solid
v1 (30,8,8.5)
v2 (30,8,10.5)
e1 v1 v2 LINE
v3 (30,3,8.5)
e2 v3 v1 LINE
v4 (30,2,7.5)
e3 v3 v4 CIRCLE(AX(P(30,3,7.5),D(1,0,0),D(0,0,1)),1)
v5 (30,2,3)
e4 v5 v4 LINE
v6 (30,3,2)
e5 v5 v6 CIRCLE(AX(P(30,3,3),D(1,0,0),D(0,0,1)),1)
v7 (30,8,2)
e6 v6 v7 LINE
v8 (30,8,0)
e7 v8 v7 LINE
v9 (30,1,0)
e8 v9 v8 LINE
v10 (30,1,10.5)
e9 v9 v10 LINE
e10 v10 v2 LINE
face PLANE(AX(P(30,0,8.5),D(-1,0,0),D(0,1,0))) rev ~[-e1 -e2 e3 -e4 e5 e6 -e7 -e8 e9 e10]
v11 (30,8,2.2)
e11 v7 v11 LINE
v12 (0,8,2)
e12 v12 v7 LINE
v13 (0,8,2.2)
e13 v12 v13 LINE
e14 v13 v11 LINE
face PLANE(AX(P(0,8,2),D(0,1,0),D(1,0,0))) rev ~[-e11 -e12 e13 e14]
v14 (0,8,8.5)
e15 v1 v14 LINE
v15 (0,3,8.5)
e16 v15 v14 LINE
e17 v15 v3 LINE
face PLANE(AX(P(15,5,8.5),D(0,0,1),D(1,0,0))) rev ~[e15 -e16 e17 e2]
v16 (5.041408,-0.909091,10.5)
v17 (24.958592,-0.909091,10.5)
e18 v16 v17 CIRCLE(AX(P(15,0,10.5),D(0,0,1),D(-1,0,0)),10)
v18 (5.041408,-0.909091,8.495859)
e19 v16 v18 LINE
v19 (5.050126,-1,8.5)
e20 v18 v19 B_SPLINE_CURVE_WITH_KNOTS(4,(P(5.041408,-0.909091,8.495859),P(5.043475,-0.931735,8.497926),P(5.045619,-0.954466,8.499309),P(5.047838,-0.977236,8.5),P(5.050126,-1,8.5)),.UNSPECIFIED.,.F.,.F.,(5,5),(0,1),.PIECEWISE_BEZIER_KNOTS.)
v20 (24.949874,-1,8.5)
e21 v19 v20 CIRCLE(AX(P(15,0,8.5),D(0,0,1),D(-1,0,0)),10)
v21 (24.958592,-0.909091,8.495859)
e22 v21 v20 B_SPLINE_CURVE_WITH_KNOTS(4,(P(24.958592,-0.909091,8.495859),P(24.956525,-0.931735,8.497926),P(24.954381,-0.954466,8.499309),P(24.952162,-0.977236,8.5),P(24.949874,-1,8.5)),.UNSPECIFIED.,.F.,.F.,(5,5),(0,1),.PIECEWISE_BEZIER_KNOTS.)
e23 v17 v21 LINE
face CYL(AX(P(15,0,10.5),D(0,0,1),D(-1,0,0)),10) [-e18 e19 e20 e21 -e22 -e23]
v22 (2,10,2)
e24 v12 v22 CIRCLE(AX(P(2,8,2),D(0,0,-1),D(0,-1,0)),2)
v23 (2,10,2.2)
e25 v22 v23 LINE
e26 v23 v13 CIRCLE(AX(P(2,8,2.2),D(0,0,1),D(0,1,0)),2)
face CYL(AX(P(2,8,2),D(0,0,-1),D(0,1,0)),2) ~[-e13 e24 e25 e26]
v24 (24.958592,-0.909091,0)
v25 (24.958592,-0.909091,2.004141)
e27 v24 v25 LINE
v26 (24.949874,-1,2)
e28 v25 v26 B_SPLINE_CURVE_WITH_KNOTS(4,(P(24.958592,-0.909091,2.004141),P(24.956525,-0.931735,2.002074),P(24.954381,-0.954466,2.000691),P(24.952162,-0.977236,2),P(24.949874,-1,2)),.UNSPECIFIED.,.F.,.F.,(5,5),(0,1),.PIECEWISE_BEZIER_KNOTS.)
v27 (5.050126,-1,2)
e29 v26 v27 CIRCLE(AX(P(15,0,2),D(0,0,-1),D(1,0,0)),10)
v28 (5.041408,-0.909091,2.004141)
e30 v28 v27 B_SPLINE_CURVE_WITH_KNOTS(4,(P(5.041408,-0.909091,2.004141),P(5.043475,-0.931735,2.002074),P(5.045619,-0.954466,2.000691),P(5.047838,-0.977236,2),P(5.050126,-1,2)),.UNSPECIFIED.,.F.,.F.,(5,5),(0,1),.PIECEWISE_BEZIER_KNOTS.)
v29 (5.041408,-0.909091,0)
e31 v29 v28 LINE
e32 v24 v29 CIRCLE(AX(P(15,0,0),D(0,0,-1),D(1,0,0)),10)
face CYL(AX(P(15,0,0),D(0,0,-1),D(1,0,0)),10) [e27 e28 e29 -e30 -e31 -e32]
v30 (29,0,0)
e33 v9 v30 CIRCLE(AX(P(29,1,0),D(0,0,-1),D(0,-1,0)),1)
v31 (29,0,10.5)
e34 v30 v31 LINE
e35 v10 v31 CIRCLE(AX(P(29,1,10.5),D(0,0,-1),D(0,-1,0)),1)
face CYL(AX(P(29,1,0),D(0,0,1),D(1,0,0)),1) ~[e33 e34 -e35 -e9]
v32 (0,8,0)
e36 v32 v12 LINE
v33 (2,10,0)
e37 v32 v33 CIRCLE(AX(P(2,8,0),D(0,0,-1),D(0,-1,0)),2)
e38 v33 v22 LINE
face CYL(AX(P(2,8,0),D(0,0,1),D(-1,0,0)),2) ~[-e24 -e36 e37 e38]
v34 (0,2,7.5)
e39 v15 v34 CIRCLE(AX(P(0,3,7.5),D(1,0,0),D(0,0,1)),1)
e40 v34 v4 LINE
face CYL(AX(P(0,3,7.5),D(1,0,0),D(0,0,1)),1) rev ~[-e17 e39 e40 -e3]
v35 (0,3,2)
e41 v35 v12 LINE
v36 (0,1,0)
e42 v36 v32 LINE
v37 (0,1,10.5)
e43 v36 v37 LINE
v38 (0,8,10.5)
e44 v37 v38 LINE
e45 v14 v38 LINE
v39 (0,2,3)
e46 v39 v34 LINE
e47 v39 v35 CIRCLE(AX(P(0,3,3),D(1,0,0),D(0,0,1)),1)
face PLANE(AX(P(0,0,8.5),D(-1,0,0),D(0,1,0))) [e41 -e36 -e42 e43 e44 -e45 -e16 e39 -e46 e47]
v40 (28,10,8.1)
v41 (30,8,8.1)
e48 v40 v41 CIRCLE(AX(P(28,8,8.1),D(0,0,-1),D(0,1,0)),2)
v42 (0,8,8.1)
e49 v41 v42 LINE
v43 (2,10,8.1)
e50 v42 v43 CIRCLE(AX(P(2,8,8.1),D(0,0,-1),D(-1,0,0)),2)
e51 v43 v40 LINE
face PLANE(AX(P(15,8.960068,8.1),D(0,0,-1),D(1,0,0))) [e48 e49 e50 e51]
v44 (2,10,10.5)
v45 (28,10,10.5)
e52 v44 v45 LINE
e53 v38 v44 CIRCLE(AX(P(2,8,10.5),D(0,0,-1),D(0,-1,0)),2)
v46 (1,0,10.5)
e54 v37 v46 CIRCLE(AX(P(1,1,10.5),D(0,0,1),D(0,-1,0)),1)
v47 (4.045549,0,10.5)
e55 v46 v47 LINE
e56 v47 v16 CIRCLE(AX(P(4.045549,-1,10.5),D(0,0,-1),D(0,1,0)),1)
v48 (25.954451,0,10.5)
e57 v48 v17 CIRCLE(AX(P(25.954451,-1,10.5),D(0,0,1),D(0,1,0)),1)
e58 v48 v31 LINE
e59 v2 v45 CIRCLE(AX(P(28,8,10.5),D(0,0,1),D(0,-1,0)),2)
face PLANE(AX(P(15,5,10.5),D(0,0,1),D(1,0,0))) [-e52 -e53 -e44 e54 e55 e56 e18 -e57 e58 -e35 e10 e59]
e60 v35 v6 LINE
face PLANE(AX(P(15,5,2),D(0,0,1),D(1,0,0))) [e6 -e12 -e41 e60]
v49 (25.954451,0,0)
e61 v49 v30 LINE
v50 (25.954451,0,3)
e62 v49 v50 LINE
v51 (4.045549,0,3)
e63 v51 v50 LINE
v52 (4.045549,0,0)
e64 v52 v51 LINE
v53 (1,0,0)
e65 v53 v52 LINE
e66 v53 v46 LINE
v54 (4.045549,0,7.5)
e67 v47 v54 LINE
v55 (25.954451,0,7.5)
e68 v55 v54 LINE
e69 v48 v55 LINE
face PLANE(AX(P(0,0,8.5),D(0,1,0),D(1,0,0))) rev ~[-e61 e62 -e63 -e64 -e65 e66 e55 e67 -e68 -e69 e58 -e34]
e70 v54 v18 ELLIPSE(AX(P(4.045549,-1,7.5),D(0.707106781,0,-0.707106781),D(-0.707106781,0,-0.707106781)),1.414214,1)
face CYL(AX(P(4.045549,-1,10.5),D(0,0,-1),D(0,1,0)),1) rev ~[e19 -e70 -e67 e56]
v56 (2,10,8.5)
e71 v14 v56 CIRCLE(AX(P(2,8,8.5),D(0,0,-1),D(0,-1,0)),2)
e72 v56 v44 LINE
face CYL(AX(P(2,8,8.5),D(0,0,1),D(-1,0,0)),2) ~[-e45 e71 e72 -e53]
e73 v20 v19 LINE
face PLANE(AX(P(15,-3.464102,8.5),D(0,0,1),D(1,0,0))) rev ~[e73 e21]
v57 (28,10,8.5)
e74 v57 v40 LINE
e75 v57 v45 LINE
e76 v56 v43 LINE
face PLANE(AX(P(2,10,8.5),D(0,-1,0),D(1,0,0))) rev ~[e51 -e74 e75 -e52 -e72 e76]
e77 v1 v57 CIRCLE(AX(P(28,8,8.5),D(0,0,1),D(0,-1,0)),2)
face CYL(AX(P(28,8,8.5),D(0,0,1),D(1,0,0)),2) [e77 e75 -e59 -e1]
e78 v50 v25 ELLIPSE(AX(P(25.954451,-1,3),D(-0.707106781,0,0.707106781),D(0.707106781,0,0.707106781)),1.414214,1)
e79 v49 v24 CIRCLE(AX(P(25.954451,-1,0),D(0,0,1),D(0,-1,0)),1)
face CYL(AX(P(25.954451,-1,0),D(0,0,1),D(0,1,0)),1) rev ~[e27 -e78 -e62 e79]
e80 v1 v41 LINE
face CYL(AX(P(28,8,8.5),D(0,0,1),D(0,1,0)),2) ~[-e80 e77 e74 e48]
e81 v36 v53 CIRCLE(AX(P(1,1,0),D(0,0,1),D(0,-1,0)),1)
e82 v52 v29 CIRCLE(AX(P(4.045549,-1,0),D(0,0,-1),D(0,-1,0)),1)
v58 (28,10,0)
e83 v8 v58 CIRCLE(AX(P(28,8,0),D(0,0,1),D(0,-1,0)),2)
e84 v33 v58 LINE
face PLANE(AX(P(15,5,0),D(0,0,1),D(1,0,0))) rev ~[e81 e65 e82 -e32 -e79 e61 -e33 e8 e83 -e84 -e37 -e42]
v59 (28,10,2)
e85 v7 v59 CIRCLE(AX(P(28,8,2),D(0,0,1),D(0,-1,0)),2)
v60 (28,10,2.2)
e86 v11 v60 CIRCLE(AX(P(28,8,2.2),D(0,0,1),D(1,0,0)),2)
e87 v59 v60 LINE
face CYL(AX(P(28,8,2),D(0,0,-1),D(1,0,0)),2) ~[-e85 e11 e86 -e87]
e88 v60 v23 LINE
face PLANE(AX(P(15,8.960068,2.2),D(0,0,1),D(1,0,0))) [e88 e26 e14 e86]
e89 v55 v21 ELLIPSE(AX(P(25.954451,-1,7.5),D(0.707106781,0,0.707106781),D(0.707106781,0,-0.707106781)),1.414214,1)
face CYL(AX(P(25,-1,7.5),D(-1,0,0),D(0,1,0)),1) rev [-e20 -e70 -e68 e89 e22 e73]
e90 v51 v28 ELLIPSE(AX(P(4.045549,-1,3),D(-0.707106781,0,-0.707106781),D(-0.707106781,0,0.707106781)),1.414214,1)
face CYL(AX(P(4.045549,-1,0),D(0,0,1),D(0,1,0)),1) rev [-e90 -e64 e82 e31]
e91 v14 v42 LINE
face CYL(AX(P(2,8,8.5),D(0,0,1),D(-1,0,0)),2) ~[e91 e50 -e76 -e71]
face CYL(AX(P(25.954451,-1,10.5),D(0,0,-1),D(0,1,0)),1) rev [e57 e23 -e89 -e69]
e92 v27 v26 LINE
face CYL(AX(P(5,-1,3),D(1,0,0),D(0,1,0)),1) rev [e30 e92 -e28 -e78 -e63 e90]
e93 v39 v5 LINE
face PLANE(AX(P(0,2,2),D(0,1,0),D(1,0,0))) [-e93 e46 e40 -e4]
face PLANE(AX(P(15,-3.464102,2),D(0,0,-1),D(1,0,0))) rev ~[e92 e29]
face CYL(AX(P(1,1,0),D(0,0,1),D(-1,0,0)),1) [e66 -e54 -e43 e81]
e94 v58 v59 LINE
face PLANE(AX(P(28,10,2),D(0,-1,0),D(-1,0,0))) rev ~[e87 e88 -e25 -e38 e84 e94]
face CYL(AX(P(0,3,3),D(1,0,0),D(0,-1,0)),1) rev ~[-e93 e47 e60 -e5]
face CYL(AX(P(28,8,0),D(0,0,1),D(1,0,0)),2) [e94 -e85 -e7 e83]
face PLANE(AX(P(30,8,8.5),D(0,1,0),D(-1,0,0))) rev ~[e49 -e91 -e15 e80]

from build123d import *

# Parameters (mm, degrees)
F0_W      = 30
F0_H      = 10
F1_DEPTH  = 2
F2_W      = 30
F2_H      = 2
F3_DEPTH  = 6.5
F4_W      = 30
F4_H      = 10
F5_DEPTH  = 2
F6_R      = 2
F8_DEPTH  = 0.2
F10_DEPTH = 0.4
F12_DEPTH = 2
F14_DEPTH = 2
F15_R     = 1


with BuildPart() as f1:
    # F0 (on Top) → F1 (new body)
    with BuildSketch(Plane.XY):
        with Locations((15, 5)):
            Rectangle(F0_W, F0_H)
    extrude(amount=F1_DEPTH)

    # F2 (on face) → F3 (join)
    with BuildSketch(Plane.XY.offset(2)):
        with Locations((15, 1)):
            Rectangle(F2_W, F2_H)
    extrude(amount=F3_DEPTH)

    # F4 (on face) → F5 (join)
    with BuildSketch(Plane.XY.offset(8.5)):
        with Locations((15, 5)):
            Rectangle(F4_W, F4_H)
    extrude(amount=F5_DEPTH)

    # F6
    f6_edges = [f1.edges().sort_by_distance(p)[0] for p in [
        (30, 10, 9.5),
        (30, 10, 1),
        (0, 10, 9.5),
        (0, 10, 1),
    ]]
    fillet(f6_edges, radius=F6_R)

    # F7 (on face) → F8 (join)
    with BuildSketch(Plane.XY.offset(2)):
        with BuildLine():
            Line((28, 10), (2, 10))
            ThreePointArc((2, 10), (0.5857864376, 9.4142135624), (0, 8))
            Line((0, 8), (30, 8))
            ThreePointArc((30, 8), (29.4142135624, 9.4142135624), (28, 10))
        make_face()
    extrude(amount=F8_DEPTH)

    # F9 (on face) → F10 (join)
    with BuildSketch(Plane(origin=(0, 0, 8.5), x_dir=(1, 0, 0), z_dir=(0, 0, -1))):
        with BuildLine():
            ThreePointArc((0, -8), (0.5857864376, -9.4142135624), (2, -10))
            Line((2, -10), (28, -10))
            ThreePointArc((28, -10), (29.4142135624, -9.4142135624), (30, -8))
            Line((30, -8), (0, -8))
        make_face()
    extrude(amount=F10_DEPTH)

    # F11 (on face) → F12 (join, through all)
    with BuildSketch(Plane.XY.offset(10.5)):
        with BuildLine():
            Line((25, 0), (15, 0))
            Line((15, 0), (5, 0))
            ThreePointArc((5, 0), (15, -10), (25, 0))
        make_face()
    extrude(amount=-F12_DEPTH)

    # F13 (on face) → F14 (join, through all)
    with BuildSketch(Plane(origin=(0, 0, 0), x_dir=(1, 0, 0), z_dir=(0, 0, -1))):
        with BuildLine():
            ThreePointArc((25, 0), (15, 10), (5, 0))
            Line((5, 0), (25, 0))
        make_face()
    extrude(amount=-F14_DEPTH)

    # F15
    f15_edges = [f1.edges().sort_by_distance(p)[0] for p in [
        (15, 0, 2),
        (15, 0, 8.5),
        (5, 0, 9.5),
        (5, 0, 1),
        (25, 0, 9.5),
        (30, 0, 5.25),
        (0, 0, 5.25),
        (15, 2, 2),
        (15, 2, 8.5),
        (25, 0, 1),
    ]]
    fillet(f15_edges, radius=F15_R)


solid = f1.part
